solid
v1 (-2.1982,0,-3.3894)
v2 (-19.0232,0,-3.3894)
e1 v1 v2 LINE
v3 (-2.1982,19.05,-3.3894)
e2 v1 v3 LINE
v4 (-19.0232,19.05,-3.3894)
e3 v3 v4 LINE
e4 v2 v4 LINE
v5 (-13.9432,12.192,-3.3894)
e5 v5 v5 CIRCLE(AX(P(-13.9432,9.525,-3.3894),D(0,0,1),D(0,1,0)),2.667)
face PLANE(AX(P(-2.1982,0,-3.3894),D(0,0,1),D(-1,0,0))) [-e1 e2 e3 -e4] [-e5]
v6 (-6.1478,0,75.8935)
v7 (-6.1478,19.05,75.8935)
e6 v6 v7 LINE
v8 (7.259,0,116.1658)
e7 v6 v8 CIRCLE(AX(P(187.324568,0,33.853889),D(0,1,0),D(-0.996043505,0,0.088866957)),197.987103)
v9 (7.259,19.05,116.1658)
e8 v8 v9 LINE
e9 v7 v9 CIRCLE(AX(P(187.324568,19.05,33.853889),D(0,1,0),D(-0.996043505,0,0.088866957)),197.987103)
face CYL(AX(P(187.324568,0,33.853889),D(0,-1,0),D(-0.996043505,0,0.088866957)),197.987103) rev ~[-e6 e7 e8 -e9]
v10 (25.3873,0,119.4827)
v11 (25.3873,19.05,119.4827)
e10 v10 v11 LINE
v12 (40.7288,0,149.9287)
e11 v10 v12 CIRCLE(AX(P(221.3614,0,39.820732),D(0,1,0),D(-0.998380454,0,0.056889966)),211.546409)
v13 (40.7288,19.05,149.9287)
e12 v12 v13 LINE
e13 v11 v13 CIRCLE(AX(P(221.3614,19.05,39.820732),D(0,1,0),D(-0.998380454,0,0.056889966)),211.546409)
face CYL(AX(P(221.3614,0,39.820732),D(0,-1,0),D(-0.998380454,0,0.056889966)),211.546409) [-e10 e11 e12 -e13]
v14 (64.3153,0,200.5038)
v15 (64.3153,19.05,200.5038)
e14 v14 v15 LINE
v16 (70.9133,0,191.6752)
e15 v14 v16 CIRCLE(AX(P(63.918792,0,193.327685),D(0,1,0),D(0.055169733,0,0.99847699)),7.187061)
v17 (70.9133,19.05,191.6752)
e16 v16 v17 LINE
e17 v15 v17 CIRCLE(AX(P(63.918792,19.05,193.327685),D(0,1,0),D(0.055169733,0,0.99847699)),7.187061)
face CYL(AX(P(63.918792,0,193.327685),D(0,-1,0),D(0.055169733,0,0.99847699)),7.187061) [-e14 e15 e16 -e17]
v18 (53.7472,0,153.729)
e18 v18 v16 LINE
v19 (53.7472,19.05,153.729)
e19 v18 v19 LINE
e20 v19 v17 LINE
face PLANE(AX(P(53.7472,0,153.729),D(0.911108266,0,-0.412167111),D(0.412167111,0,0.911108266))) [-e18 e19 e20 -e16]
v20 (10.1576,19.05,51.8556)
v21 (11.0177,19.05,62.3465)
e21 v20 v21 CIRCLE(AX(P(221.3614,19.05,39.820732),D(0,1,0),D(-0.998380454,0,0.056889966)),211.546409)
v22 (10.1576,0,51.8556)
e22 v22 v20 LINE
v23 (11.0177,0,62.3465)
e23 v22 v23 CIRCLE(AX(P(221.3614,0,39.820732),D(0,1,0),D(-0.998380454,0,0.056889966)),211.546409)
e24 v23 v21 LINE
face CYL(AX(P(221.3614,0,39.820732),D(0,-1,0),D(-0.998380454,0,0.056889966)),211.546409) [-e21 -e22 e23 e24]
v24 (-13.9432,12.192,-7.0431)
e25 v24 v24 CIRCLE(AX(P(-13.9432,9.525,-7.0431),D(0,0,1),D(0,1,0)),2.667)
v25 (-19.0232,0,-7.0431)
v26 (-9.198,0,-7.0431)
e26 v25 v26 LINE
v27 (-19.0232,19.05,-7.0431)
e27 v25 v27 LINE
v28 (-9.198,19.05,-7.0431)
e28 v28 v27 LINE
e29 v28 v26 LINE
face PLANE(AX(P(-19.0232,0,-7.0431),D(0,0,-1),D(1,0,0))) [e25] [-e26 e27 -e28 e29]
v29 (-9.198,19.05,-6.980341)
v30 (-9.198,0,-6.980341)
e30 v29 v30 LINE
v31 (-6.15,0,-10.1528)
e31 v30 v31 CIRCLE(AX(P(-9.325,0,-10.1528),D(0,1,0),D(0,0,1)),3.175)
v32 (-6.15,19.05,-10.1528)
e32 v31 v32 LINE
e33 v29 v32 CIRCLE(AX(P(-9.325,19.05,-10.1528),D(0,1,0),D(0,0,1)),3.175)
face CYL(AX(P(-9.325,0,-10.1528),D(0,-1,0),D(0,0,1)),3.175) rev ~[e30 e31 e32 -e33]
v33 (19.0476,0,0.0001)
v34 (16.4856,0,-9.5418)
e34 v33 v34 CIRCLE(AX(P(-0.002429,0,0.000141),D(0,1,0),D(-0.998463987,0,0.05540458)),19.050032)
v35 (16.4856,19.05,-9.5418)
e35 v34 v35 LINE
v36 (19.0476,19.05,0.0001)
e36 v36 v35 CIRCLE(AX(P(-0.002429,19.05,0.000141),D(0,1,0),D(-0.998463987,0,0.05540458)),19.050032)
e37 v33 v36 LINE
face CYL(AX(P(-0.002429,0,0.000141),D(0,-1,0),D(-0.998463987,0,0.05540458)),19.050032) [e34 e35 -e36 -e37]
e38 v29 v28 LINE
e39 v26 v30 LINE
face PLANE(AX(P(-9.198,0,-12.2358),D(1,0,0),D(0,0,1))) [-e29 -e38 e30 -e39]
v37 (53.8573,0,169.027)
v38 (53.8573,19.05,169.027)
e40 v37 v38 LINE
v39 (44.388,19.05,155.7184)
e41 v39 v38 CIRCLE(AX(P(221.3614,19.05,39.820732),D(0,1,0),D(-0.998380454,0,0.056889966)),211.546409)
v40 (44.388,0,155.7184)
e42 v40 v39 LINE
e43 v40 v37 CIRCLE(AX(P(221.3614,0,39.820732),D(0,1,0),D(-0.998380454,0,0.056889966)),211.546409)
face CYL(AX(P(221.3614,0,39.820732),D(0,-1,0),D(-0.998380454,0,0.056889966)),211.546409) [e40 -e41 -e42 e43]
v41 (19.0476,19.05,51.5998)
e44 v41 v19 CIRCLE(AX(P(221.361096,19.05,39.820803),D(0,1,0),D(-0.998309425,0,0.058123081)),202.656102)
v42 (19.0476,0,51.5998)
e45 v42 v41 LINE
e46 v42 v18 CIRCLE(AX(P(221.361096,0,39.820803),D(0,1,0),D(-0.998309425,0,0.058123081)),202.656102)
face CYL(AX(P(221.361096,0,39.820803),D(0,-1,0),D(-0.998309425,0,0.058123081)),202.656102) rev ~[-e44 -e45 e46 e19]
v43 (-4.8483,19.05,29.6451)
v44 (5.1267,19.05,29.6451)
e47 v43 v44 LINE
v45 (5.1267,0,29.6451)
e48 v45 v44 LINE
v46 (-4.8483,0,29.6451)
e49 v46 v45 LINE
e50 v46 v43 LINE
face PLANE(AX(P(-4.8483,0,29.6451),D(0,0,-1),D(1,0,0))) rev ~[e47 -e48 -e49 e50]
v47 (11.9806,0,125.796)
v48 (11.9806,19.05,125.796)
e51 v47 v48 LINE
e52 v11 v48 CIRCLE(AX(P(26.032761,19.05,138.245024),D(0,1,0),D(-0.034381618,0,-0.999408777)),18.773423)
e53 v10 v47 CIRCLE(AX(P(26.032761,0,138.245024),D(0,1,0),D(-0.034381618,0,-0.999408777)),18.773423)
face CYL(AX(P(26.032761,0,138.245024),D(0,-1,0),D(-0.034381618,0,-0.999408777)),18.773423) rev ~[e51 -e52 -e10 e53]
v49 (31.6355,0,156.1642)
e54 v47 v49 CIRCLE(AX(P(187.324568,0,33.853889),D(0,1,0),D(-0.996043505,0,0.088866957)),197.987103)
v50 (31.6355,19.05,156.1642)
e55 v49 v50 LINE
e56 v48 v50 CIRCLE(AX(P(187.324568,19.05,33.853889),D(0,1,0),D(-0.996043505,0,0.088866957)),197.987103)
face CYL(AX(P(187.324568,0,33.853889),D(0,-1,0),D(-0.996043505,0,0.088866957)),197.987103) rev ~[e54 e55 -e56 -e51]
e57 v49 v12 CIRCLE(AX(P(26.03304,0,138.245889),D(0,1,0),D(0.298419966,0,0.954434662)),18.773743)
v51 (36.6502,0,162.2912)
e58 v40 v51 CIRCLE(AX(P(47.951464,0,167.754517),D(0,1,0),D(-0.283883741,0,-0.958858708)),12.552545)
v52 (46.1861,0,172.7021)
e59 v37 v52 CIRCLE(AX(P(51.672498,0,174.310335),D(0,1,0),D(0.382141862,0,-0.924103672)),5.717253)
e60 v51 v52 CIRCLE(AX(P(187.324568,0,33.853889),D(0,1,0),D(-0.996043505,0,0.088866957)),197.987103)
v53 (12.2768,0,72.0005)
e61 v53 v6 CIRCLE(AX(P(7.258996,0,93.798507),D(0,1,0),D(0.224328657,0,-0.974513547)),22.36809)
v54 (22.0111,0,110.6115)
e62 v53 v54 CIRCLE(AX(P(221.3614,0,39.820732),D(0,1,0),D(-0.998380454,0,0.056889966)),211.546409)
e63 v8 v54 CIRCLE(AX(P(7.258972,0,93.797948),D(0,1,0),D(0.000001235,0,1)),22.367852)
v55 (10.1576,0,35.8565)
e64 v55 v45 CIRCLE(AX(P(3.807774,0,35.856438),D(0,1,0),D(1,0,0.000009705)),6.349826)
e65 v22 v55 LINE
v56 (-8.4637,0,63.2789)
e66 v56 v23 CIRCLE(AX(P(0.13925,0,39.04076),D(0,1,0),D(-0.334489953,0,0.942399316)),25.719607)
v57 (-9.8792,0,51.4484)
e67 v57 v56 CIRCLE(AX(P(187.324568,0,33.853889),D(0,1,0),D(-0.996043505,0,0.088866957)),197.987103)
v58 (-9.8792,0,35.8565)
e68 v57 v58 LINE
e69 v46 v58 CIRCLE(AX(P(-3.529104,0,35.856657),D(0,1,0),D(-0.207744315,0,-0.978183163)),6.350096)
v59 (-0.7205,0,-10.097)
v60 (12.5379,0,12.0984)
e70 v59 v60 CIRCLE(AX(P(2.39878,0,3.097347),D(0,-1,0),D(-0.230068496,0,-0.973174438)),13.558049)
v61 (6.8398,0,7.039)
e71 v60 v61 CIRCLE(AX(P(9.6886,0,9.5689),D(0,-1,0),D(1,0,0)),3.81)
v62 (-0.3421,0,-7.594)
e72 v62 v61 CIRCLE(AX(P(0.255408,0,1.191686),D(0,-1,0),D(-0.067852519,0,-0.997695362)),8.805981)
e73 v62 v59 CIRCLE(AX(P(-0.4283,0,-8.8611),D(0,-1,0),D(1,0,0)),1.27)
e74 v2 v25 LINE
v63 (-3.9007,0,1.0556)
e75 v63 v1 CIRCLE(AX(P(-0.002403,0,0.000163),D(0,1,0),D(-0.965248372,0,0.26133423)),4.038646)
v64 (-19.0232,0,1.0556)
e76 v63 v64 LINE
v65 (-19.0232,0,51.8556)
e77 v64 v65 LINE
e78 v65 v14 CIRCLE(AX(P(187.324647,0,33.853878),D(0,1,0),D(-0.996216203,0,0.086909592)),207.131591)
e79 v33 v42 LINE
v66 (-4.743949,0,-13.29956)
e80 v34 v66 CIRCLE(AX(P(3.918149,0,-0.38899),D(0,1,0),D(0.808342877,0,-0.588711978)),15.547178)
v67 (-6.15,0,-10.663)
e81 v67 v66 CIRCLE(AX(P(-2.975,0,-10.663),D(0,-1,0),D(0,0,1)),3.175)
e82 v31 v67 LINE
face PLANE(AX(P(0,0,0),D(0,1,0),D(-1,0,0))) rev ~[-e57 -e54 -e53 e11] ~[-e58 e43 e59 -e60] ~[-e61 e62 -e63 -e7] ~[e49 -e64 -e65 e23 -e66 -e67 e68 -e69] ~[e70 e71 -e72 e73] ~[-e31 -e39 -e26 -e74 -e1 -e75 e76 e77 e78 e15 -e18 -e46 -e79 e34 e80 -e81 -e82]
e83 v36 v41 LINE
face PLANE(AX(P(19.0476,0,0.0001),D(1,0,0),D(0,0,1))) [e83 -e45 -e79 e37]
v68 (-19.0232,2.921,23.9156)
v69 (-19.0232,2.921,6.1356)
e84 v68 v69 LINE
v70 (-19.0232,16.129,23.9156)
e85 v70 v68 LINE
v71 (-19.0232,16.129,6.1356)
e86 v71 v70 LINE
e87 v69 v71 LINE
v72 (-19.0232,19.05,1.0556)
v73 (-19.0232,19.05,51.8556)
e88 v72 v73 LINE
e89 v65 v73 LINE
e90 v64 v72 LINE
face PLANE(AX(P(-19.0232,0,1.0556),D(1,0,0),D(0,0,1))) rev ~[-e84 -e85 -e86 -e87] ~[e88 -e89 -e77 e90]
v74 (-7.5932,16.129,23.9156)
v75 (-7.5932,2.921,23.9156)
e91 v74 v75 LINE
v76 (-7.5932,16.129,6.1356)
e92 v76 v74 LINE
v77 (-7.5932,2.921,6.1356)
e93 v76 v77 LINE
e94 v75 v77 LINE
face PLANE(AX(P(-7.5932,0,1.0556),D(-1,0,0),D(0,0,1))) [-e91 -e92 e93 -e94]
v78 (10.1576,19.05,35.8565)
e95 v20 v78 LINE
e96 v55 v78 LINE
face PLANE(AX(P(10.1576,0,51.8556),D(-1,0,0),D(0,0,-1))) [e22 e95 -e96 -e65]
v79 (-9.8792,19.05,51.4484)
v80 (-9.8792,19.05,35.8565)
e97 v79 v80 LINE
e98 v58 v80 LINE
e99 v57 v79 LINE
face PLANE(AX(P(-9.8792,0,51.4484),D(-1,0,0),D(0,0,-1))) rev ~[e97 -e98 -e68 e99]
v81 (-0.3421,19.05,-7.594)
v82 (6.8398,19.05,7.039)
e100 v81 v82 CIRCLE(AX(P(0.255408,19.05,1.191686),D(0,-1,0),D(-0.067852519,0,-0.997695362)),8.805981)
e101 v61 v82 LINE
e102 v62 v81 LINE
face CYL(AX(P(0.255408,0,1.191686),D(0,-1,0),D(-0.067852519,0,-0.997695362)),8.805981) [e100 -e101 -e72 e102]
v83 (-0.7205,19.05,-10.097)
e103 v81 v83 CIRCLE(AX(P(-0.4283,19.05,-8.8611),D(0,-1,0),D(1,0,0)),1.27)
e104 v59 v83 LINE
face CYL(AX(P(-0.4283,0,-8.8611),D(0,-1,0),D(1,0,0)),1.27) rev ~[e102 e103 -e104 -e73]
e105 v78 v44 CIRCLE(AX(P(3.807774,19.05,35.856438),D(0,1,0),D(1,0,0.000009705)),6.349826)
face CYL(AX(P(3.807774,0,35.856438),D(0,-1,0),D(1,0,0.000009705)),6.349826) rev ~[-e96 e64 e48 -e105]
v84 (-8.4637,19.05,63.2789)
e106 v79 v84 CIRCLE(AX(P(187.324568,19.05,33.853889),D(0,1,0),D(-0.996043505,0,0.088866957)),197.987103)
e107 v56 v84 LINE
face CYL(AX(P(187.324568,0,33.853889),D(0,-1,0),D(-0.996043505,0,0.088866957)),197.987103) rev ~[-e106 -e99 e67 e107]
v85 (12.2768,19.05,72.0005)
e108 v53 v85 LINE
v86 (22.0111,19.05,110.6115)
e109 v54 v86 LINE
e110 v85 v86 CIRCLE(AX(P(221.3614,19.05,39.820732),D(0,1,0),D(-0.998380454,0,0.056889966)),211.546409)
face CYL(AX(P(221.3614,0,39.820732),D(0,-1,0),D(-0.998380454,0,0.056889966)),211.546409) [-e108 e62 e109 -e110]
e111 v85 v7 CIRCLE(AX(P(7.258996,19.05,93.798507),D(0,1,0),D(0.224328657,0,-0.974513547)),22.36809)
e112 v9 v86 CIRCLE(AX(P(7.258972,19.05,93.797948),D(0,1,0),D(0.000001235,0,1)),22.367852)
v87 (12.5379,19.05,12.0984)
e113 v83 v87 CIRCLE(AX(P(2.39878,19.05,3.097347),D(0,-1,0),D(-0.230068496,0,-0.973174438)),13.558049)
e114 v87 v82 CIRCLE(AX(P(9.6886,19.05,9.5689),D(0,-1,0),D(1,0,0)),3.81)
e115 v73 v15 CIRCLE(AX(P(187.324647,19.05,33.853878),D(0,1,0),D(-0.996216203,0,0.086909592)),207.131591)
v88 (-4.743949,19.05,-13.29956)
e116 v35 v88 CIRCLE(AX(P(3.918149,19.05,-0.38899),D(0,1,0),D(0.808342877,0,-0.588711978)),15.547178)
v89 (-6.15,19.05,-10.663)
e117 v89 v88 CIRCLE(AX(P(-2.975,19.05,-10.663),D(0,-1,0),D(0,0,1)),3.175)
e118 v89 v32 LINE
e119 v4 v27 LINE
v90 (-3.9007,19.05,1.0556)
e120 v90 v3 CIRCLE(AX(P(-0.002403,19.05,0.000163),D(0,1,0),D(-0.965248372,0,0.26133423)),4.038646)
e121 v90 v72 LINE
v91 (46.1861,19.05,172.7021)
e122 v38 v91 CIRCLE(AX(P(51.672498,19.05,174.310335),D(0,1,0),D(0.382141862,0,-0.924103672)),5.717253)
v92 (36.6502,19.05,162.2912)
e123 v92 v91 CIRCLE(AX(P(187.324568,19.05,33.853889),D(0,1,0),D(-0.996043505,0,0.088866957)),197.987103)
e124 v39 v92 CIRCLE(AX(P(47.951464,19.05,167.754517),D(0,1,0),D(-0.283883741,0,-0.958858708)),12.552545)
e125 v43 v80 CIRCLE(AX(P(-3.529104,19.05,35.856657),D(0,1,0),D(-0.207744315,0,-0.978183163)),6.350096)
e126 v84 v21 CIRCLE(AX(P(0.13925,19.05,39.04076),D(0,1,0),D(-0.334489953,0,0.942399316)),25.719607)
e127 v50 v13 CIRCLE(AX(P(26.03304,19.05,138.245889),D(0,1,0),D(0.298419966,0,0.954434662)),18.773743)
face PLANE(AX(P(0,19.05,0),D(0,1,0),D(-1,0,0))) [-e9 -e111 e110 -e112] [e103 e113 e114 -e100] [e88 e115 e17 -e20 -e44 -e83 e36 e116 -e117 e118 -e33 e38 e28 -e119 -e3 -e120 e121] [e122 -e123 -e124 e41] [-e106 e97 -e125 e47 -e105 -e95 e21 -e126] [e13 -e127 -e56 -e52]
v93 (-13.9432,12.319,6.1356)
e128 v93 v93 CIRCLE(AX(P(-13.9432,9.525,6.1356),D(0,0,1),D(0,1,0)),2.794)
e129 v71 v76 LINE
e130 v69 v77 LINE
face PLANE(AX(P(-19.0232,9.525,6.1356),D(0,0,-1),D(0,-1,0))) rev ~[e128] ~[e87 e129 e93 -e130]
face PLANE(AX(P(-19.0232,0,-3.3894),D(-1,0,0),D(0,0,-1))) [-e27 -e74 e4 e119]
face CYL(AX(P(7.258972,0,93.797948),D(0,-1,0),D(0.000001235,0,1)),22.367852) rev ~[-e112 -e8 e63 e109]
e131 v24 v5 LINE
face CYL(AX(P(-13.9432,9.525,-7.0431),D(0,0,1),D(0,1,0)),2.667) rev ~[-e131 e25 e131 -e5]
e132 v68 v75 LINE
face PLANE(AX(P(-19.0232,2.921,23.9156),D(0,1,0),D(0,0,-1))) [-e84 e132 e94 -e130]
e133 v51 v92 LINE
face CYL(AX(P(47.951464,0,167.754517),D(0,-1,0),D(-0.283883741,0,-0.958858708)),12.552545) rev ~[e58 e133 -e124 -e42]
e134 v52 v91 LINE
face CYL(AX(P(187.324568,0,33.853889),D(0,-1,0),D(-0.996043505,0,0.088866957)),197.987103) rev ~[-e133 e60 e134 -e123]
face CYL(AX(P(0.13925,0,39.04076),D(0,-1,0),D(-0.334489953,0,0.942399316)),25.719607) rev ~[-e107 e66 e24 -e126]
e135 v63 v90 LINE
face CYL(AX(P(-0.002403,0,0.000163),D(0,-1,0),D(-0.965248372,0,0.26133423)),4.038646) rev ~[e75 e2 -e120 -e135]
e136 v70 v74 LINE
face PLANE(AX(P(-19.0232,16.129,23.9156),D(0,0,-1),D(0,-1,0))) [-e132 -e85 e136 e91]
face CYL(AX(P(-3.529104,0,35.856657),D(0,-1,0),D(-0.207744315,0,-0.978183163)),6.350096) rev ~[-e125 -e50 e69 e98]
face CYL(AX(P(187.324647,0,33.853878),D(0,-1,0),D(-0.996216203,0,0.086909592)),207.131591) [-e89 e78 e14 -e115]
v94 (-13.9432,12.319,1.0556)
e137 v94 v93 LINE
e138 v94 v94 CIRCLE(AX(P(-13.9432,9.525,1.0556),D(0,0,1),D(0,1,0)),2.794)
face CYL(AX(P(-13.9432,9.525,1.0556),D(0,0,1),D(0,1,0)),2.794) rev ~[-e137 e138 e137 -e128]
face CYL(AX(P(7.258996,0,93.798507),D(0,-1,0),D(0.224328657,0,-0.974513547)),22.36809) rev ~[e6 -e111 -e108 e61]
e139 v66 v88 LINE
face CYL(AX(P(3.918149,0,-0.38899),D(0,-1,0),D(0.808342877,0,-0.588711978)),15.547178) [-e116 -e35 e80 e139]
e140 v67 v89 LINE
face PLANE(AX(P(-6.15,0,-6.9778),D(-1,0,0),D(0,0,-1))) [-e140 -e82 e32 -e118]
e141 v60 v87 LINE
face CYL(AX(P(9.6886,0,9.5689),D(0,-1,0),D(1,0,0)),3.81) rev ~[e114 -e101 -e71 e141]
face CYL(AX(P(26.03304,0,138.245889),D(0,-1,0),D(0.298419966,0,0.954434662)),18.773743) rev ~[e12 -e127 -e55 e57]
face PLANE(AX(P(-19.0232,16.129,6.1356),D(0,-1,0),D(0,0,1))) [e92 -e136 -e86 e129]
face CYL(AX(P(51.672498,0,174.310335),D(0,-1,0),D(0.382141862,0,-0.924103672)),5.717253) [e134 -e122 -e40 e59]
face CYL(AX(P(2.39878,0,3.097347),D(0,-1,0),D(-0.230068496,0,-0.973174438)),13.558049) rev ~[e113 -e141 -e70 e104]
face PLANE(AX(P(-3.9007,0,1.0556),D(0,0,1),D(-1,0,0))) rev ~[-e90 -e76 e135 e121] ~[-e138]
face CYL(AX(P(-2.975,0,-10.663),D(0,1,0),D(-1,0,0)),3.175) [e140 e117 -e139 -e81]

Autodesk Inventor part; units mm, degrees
ref_plane "YZ Plane" through (0, 0, 0) normal (1, 0, 0) x (0, 1, 0)
ref_plane "XZ Plane" through (0, 0, 0) normal (0, 1, 0) x (-1, 0, 0)
ref_plane "XY Plane" through (0, 0, 0) normal (0, 0, 1) x (1, 0, 0)
sketch "Sketch1" plane through (0, 0, 0) normal (0, 1, 0) x (-1, 0, 0)
  arc A0 (3.9007, 1.0556) -> (2.1982, -3.3894) centre (0.0024, 0.0001) ccw
  arc A1 (19.0232, 1.0556) -> (-16.4856, -9.5418) centre (0.0024, 0.0001) ccw
  line L0 (3.9007, 1.0556) -> (19.0232, 1.0556)
  line L1 (2.1982, -3.3894) -> (19.0232, -3.3894)
  line L2 (19.0232, -7.0431) -> (11.658, -7.0431)
  line L3 (19.0232, -3.3894) -> (19.0232, -7.0431)
  arc A2 (-16.4856, -9.5418) -> (7.4534, -10.991) centre (-3.9181, -0.3889) ccw
  line L4 (19.0232, 1.0556) -> (19.0232, 51.8556)
  line L5 (-19.0476, 0.0001) -> (-19.0476, 51.8556)
  line L6 (-19.0476, 0.0001) -> (-19.4605, 0.0001)
  arc A3 (19.0232, 51.8556) -> (-64.3153, 200.5038) centre (-187.3249, 33.8538) ccw
  arc A4 (-19.0476, 51.5998) -> (-53.7472, 153.729) centre (-221.3606, 39.8209) ccw
  line L7 (9.8792, 51.4484) -> (9.8792, 35.8565)
  arc A5 (-10.1576, 51.8556) -> (-53.8573, 169.027) centre (-221.3606, 39.8209) ccw
  line L8 (-10.1576, 51.8556) -> (-10.1576, 35.8565)
  line L9 (9.8792, 23.8284) -> (-10.1576, 23.8284) construction
  line L10 (9.8792, 23.8284) -> (29.9159, 23.8284) construction
  arc A6 (4.8483, 29.6451) -> (9.8792, 35.8565) centre (3.5292, 35.8565) ccw
  arc A7 (-10.1576, 35.8565) -> (-5.1267, 29.6451) centre (-3.8076, 35.8565) ccw
  line L11 (4.8483, 29.6451) -> (-5.1267, 29.6451)
  arc A8 (19.0232, 51.8556) -> (-64.3153, 200.5038) centre (-187.3249, 33.8538) ccw
  arc A9 (-31.6355, 156.1642) -> (-40.7288, 149.9287) centre (-26.0329, 138.2456) ccw
  arc A10 (-25.3873, 119.4827) -> (-11.9806, 125.796) centre (-26.0329, 138.2456) ccw
  arc A11 (-7.259, 116.1658) -> (-22.0111, 110.6115) centre (-7.259, 93.7981) ccw
  arc A12 (-12.2768, 72.0005) -> (6.1478, 75.8935) centre (-7.259, 93.7981) ccw
  arc A13 (8.4637, 63.2789) -> (-11.0177, 62.3465) centre (-0.1392, 39.0411) ccw
  arc A14 (-44.388, 155.7184) -> (-36.6502, 162.2912) centre (-47.9514, 167.7544) ccw
  line L12 (7.4534, -9.5831) -> (7.4534, -10.991)
  line L13 (11.658, -7.0431) -> (9.9934, -7.0431)
  line L14 (9.9934, -7.0431) -> (7.4534, -7.0431)
  line L15 (7.4534, -7.0431) -> (7.4534, -9.5831)
  line L16 (-53.7472, 153.729) -> (-70.9133, 191.6752)
  arc A15 (-64.3153, 200.5038) -> (-70.9133, 191.6752) centre (-63.9188, 193.3277) ccw
  arc A16 (-53.8573, 169.027) -> (-46.1861, 172.7021) centre (-51.6725, 174.3104) ccw
  arc A17 (9.8792, 51.4484) -> (-46.1861, 172.7021) centre (-187.3249, 33.8538) ccw
  point P0 (-0.1392, 29.6451)
  point P1 (19.0232, 1.0556)
  point P2 (-64.3153, 200.5038)
  point P3 (7.4534, 1.0556)
  dimension "d17" = 8.0772
  dimension "d19" = 4.445
  dimension "d22" = 50.8
  dimension "d27" = 8.89
  dimension "d28" = 8.89
  dimension "d31" = 180
  dimension "d32" = 6.35
  dimension "d33" = 207.1318
  dimension "d34" = 33.8537
  dimension "d35" = 29.6449
  dimension "d36" = 19.05
  dimension "d37" = 3.3895
extrude "Extrusion1" add sketch "Sketch1" along normal blind 19.05 contours A0 L1 L3 L2 L13 L14 L15 L12 A2 A1 L0 | A1 L5 A4 L16 A15 A3 L4 | A13 A5 A12 A17 | A11 A5 A10 A17 | A9 A5 A14 A17
fillet "Fillet1" radius 1.27 1 edges at (-7.4534, 9.525, -7.0431)
sketch "Sketch2" plane through (-19.0232, 0, -7.0431) normal (0, 0, -1) x (-1, 0, 0)
  line L0 (0, 0) -> (0, 19.05) projected
  line L1 (-10.2998, 19.05) -> (0, 19.05) projected
  point P0 (-19.0232, 0)
  point P1 (-5.08, 9.525)
  point P2 (0, 9.525)
  point P3 (-5.1499, 19.05)
  dimension "d44" = 5.08
  dimension "d45" = 9.525
hole "Hole1" at (-13.9432, 9.525, -7.0431) direction (0, 0, 1) diameter 5.334 end up to surface
sketch "Sketch3" plane through (-3.9007, 0, 1.0556) normal (0, 0, -1) x (-1, 0, 0)
  circle A0 centre (10.0425, 9.525) radius 2.667 projected
  point P0 (-3.9007, 0)
hole "Hole2" at (-13.9432, 9.525, 1.0556) direction (0, 0, 1) diameter 5.588 depth 10.16
sketch "Sketch4" plane through (-19.0232, 0, 1.0556) normal (-1, 0, 0) x (0, 0, 1)
  line L0 (0, 6.731) -> (0, 12.319) projected
  line L1 (10.16, 12.319) -> (10.16, 6.731) projected
  line L2 (0, 6.731) -> (5.08, 6.731)
  line L3 (10.16, 6.731) -> (0, 6.731) projected
  line L4 (0, 12.319) -> (5.08, 12.319)
  line L5 (10.16, 12.319) -> (0, 12.319) projected
  line L6 (0, 0) -> (50.8, 0) projected
  line L7 (0, 9.525) -> (16.1442, 9.525) construction
  line L8 (5.08, 9.525) -> (5.08, 2.921)
  line L9 (5.08, 9.525) -> (5.08, 16.129)
  line L10 (5.08, 16.129) -> (22.86, 16.129)
  line L11 (22.86, 16.129) -> (22.86, 2.921)
  line L12 (22.86, 2.921) -> (5.08, 2.921)
  point P0 (-1.0556, 0)
  dimension "d63" = 5.08
  dimension "d65" = 6.604
  dimension "d66" = 6.604
  dimension "d67" = 17.78
extrude "Extrusion2" cut sketch "Sketch4" against normal blind 11.43 contours L8 L9 L5 L1 L3 | L3 L1 L5 L9 L10 L11 L12 L8
sketch "Sketch6" plane through (0, 0, 0) normal (0, -1, 0) x (1, 0, 0)
  circle A0 centre (-0.4283, -8.8611) radius 1.27
  circle A1 centre (9.6886, 9.5689) radius 3.81
  arc A2 (-0.3421, -7.594) -> (6.8398, 7.039) centre (0.2554, 1.1917) ccw
  arc A3 (-0.7205, -10.097) -> (12.5379, 12.0984) centre (2.3988, 3.0973) ccw
  arc A4 (-7.4534, -10.991) -> (16.4856, -9.5418) centre (3.9181, -0.3889) ccw projected
  line L0 (-9.198, -6.9778) -> (-6.15, -6.9778)
  line L1 (-6.15, -6.9778) -> (-6.15, -12.2358)
  line L2 (-6.15, -12.2358) -> (-9.198, -12.2358)
  line L3 (-9.198, -12.2358) -> (-9.198, -6.9778)
  point P0 (0, 0)
  dimension "d90" = 3.048
  dimension "d91" = 2.54
extrude "Extrusion4" cut sketch "Sketch6" against normal blind 25.4
fillet "Fillet2" radius 3.175 1 edges at (-6.15, 9.525, -6.9778)
fillet "Fillet3" radius 3.175 1 edges at (-6.15, 9.525, -12.2358)
sketch "Sketch9" plane through (0, 0, 0) normal (0, -1, 0) x (1, 0, 0)
  point P0 (0, 0)
sketch "Sketch7" plane through (0, 0, 0) normal (0, -1, 0) x (1, 0, 0)
  circle A0 centre (0, 0) radius 5.1181
  dimension "d96" = 10.2362
sketch "Sketch8" plane through (0, 0, 0) normal (0, -1, 0) x (1, 0, 0)
  arc A0 (-3.835, -3.3894) -> (-5.0081, 1.0556) centre (0, 0) ccw projected
  arc A1 (-0.3421, -7.594) -> (6.8398, 7.039) centre (0.2554, 1.1917) ccw projected
  arc A2 (12.5379, 12.0984) -> (6.8398, 7.039) centre (9.6886, 9.5689) ccw projected
  arc A3 (-0.7205, -10.097) -> (12.5379, 12.0984) centre (2.3988, 3.0973) ccw projected
  arc A4 (-0.3421, -7.594) -> (-0.7205, -10.097) centre (-0.4283, -8.8611) ccw projected
  circle A5 centre (9.6886, 9.5689) radius 3.81
  circle A6 centre (-0.4283, -8.8611) radius 1.27
  arc A7 (-0.3421, -7.594) -> (6.8398, 7.039) centre (1.573, 0.545) ccw
  point P0 (0.0088, -7.6687)
  point P1 (7.474, 6.4687)
  point P2 (6.8398, 7.039)
  point P3 (-0.3421, -7.594)
properties part number "Central Claw V2_3DPrint"
